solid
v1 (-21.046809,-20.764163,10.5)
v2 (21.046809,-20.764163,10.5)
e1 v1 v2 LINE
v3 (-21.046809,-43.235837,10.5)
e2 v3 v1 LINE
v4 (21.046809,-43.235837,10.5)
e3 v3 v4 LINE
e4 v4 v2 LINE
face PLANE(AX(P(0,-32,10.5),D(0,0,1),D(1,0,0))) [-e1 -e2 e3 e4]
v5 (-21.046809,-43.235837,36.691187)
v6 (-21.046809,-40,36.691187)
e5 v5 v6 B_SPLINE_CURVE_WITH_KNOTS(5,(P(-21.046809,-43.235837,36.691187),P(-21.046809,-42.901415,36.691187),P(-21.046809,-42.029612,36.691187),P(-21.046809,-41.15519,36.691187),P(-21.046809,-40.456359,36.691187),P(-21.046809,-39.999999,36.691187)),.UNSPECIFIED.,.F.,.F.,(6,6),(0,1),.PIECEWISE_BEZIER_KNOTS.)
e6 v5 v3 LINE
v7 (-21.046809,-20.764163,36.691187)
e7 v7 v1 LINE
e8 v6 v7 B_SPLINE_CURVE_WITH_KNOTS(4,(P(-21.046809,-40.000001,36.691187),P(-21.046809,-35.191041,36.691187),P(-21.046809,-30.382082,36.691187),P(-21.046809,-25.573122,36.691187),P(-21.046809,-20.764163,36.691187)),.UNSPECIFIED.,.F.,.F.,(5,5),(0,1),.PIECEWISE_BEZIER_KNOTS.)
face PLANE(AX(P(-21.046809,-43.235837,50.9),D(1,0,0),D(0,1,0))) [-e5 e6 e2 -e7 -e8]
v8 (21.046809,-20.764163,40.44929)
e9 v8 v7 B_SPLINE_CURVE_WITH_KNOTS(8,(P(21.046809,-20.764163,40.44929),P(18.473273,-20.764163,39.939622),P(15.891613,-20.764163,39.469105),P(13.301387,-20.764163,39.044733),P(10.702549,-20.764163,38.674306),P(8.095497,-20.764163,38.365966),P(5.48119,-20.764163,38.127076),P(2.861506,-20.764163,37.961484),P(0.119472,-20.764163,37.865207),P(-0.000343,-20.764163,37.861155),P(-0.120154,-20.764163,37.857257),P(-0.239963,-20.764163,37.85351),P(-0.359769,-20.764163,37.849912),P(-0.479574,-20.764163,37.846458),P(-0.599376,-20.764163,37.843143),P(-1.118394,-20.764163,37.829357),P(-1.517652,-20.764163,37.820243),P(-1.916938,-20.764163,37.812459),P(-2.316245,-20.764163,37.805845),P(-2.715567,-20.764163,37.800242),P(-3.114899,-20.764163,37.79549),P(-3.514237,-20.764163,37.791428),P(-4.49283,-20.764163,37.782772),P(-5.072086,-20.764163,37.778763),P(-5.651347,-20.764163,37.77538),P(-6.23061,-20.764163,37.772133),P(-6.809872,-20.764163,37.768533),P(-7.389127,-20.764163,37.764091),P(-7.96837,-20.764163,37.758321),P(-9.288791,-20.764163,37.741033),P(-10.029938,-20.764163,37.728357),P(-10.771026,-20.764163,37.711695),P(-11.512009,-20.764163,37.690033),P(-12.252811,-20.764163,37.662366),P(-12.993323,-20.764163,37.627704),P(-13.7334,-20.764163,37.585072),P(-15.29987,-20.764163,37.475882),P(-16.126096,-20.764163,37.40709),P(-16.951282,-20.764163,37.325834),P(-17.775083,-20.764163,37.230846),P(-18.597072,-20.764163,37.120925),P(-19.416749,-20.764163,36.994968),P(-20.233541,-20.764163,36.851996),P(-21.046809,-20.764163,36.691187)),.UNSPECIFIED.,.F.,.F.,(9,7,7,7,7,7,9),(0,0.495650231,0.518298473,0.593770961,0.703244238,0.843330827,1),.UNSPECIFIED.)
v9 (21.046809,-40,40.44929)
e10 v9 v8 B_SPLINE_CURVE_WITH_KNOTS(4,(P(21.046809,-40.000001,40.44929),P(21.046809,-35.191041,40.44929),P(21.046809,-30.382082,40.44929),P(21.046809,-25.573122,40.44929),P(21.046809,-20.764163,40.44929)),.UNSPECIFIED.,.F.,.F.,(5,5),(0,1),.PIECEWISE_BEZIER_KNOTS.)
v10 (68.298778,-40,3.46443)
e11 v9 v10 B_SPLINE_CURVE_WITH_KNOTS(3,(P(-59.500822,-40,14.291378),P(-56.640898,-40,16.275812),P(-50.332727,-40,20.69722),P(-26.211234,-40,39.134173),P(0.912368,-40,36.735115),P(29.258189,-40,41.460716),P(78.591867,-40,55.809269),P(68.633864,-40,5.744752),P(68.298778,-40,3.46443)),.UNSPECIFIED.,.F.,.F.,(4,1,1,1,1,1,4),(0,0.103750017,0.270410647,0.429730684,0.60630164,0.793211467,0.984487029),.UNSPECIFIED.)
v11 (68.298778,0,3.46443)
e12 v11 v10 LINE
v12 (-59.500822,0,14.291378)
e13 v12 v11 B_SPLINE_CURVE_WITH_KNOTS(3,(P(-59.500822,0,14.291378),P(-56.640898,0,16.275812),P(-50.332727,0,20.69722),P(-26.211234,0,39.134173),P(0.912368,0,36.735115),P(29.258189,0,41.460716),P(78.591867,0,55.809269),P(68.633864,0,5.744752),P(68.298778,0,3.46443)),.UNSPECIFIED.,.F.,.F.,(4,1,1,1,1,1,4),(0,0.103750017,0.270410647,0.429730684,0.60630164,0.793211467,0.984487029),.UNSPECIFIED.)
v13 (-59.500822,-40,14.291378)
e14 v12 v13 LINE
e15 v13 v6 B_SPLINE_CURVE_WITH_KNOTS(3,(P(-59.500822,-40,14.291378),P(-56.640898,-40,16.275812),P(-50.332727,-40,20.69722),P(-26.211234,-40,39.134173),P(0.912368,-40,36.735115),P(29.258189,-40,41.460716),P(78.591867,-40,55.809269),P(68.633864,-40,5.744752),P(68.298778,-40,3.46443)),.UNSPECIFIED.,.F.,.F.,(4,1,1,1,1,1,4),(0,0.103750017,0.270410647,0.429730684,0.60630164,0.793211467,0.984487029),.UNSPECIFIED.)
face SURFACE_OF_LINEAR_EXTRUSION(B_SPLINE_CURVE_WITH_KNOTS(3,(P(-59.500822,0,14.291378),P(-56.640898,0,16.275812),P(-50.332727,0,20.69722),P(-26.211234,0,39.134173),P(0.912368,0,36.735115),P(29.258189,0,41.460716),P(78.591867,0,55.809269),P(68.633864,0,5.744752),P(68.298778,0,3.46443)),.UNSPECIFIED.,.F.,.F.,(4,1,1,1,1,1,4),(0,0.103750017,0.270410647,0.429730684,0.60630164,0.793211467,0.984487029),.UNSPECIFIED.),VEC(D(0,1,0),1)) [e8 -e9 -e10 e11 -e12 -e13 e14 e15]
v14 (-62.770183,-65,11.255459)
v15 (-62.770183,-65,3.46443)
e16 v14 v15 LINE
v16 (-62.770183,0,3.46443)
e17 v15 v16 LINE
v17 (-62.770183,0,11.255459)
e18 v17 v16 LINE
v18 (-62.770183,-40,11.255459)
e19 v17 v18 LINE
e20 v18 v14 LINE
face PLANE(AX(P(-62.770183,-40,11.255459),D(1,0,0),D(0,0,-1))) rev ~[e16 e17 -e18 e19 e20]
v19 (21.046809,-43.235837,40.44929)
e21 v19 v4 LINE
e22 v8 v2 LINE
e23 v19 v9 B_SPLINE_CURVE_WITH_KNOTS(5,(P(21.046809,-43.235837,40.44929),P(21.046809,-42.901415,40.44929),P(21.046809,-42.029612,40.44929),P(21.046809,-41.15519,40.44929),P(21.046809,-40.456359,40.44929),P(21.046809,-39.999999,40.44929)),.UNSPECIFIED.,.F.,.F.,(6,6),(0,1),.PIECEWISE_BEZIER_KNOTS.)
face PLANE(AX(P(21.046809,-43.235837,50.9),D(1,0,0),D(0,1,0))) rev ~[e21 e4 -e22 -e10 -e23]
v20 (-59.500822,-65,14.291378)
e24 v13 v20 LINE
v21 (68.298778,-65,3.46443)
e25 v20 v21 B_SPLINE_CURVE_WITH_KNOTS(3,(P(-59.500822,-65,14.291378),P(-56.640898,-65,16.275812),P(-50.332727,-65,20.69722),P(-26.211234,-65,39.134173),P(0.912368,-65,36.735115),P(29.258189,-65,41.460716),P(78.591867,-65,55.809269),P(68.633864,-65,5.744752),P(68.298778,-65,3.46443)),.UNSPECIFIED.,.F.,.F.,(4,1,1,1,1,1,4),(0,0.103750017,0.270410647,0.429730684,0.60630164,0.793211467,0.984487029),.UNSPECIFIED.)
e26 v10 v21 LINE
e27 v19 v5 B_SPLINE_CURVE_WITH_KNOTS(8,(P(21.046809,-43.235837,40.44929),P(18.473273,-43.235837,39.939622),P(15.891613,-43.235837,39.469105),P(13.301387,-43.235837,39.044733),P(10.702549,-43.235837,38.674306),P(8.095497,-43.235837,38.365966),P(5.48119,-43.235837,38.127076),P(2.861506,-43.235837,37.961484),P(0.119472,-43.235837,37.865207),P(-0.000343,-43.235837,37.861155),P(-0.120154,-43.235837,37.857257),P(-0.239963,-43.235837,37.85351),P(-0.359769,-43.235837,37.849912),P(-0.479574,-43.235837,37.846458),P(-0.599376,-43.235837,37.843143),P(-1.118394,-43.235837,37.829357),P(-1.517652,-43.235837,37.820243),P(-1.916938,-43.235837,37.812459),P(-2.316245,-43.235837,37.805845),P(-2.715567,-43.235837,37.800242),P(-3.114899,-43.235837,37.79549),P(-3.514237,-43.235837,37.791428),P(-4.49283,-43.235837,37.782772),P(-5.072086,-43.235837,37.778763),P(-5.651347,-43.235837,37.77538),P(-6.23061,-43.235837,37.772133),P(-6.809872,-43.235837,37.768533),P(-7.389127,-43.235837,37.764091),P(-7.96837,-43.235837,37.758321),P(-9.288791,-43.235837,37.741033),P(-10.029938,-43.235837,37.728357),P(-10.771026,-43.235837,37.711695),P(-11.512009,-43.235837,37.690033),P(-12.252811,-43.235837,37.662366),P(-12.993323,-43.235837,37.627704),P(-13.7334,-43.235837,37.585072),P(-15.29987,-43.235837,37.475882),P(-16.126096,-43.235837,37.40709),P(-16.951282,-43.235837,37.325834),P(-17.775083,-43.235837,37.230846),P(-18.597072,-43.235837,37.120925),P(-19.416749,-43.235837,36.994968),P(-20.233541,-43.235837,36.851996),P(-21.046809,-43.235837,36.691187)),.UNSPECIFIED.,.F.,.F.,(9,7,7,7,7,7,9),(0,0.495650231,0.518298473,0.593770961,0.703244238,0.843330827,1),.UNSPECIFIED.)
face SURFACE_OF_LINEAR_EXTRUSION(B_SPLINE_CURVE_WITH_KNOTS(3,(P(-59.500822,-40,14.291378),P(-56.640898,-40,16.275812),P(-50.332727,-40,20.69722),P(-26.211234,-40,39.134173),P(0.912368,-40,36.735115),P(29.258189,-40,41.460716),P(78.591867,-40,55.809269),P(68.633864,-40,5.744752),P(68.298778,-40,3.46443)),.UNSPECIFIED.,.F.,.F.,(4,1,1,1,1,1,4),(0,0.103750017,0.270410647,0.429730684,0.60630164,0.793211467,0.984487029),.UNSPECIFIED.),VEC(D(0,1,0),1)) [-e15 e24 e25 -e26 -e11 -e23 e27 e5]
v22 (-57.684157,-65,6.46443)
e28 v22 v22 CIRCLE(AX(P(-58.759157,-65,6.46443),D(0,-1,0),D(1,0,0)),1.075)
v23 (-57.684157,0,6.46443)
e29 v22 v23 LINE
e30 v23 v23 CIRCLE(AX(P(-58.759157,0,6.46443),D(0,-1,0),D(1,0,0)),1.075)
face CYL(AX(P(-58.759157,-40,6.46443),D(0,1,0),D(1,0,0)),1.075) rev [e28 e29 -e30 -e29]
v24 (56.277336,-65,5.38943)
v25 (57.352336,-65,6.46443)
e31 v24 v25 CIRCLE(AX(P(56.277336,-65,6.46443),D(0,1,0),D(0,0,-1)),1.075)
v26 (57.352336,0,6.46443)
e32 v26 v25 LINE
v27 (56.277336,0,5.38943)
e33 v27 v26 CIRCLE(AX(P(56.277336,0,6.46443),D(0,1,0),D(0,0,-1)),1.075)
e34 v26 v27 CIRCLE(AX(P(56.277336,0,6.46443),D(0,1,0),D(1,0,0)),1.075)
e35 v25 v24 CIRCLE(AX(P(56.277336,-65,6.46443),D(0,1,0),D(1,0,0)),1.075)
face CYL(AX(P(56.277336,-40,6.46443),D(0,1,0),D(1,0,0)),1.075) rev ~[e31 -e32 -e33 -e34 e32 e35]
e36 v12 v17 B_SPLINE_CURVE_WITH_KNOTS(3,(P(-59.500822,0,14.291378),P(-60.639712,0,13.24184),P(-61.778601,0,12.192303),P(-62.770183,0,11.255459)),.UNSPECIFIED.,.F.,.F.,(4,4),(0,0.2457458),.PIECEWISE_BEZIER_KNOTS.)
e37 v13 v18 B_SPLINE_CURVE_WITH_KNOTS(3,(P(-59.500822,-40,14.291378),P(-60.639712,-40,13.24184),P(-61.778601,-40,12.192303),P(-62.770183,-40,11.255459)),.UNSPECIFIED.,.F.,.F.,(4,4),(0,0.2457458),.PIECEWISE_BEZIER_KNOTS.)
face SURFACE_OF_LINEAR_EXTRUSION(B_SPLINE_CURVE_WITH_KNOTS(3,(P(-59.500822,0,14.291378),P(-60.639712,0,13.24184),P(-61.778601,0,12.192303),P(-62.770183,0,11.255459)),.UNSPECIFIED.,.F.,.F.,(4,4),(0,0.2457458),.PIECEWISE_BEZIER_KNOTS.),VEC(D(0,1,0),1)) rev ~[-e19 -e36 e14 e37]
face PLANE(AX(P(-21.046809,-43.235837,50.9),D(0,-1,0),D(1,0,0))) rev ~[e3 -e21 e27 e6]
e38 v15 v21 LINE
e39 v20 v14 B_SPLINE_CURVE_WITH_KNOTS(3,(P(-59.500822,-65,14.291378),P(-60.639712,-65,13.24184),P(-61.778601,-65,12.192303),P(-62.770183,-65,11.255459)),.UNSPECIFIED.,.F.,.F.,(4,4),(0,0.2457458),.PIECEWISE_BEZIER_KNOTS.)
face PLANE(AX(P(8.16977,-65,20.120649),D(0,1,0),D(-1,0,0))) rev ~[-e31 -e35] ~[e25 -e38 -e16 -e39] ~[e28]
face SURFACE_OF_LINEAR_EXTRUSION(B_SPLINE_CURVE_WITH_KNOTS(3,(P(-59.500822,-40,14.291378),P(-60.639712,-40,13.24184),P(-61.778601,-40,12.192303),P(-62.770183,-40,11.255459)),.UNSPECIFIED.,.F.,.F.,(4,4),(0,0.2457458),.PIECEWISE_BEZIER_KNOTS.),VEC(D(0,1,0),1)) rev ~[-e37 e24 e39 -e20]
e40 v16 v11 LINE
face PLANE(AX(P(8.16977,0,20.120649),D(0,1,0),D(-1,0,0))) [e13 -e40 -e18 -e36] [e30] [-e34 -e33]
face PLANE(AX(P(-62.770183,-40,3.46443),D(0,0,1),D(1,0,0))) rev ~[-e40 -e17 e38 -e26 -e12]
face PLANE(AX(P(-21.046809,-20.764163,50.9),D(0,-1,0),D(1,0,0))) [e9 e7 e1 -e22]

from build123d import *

# Parameters (mm, degrees)
F0_R     = 1.075
F1_DEPTH = 40
F2_DEPTH = 25
F3_DEPTH = 65.0010001
F5_W     = 42.0936179509
F5_H     = 22.4716748974
F6_DEPTH = 40.4


# Not quite as in the source:
# - a feature names something its author has since deleted; it is built from what else it names


with BuildPart() as f1:
    # F0 (on Front) → F1 (new body)
    with BuildSketch(Plane.XZ):
        with BuildLine():
            add(Edge.make_bspline(
                [(-59.500822073, 14.2913783373), (-56.6408981002, 16.2758116459), (-50.3327268236, 20.6972197265), (-26.2112339189, 39.1341727928), (0.9123679388, 36.7351149169), (29.2581893858, 41.4607157621), (78.5918665024, 55.8092687145), (68.6338635649, 5.7447523544), (68.2987782308, 3.4644304492)],
                knots=[0, 0, 0, 0, 0.1037500168, 0.2704106474, 0.4297306838, 0.6063016403, 0.793211467, 0.984487029, 0.984487029, 0.984487029, 0.984487029], degree=3))
            add(Edge.make_bspline(
                [(-59.500822073, 14.2913783373), (-60.6397116048, 13.241840497), (-61.7786011366, 12.1923026567), (-62.7701834043, 11.2554590394)],
                knots=[0, 0, 0, 0, 0.2457457998, 0.2457457998, 0.2457457998, 0.2457457998], degree=3))
            Line((-62.7701834043, 11.2554590394), (-62.7701834043, 3.4644304492))
            Line((-62.7701834043, 3.4644304492), (56.2773359432, 3.4644304492))
            Line((56.2773359432, 3.4644304492), (68.2987782308, 3.4644304492))
        make_face()
        with Locations((-58.7591566145, 6.4644304492)):
            Circle(F0_R, mode=Mode.SUBTRACT)
        with BuildLine():
            ThreePointArc((57.3523359432, 6.4644304492), (57.0374757329, 5.7042906594), (56.2773359432, 5.3894304492))
            ThreePointArc((56.2773359432, 5.3894304492), (55.5171961534, 7.2245702389), (57.3523359432, 6.4644304492))
        make_face(mode=Mode.SUBTRACT)
    extrude(amount=F1_DEPTH)

    # F2 (add): a face of the model
    f2_faces = [f1.faces().sort_by_distance(p)[0] for p in [
        (12.7289792957, -40, 21.2534595653),
    ]]
    extrude(f2_faces, amount=F2_DEPTH)

    # F0 (on Front) → F3 (cut, through all)
    with BuildSketch(Plane.XZ):
        with Locations((-58.7591566145, 6.4644304492)):
            Circle(F0_R)
    extrude(amount=F3_DEPTH, mode=Mode.SUBTRACT)

    # F5 (on offset) → F6 (cut)
    with BuildSketch(Plane.XY.offset(50.9)):
        with Locations((0, -32)):
            Rectangle(F5_W, F5_H)
    extrude(amount=-F6_DEPTH, mode=Mode.SUBTRACT)


solid = f1.part
